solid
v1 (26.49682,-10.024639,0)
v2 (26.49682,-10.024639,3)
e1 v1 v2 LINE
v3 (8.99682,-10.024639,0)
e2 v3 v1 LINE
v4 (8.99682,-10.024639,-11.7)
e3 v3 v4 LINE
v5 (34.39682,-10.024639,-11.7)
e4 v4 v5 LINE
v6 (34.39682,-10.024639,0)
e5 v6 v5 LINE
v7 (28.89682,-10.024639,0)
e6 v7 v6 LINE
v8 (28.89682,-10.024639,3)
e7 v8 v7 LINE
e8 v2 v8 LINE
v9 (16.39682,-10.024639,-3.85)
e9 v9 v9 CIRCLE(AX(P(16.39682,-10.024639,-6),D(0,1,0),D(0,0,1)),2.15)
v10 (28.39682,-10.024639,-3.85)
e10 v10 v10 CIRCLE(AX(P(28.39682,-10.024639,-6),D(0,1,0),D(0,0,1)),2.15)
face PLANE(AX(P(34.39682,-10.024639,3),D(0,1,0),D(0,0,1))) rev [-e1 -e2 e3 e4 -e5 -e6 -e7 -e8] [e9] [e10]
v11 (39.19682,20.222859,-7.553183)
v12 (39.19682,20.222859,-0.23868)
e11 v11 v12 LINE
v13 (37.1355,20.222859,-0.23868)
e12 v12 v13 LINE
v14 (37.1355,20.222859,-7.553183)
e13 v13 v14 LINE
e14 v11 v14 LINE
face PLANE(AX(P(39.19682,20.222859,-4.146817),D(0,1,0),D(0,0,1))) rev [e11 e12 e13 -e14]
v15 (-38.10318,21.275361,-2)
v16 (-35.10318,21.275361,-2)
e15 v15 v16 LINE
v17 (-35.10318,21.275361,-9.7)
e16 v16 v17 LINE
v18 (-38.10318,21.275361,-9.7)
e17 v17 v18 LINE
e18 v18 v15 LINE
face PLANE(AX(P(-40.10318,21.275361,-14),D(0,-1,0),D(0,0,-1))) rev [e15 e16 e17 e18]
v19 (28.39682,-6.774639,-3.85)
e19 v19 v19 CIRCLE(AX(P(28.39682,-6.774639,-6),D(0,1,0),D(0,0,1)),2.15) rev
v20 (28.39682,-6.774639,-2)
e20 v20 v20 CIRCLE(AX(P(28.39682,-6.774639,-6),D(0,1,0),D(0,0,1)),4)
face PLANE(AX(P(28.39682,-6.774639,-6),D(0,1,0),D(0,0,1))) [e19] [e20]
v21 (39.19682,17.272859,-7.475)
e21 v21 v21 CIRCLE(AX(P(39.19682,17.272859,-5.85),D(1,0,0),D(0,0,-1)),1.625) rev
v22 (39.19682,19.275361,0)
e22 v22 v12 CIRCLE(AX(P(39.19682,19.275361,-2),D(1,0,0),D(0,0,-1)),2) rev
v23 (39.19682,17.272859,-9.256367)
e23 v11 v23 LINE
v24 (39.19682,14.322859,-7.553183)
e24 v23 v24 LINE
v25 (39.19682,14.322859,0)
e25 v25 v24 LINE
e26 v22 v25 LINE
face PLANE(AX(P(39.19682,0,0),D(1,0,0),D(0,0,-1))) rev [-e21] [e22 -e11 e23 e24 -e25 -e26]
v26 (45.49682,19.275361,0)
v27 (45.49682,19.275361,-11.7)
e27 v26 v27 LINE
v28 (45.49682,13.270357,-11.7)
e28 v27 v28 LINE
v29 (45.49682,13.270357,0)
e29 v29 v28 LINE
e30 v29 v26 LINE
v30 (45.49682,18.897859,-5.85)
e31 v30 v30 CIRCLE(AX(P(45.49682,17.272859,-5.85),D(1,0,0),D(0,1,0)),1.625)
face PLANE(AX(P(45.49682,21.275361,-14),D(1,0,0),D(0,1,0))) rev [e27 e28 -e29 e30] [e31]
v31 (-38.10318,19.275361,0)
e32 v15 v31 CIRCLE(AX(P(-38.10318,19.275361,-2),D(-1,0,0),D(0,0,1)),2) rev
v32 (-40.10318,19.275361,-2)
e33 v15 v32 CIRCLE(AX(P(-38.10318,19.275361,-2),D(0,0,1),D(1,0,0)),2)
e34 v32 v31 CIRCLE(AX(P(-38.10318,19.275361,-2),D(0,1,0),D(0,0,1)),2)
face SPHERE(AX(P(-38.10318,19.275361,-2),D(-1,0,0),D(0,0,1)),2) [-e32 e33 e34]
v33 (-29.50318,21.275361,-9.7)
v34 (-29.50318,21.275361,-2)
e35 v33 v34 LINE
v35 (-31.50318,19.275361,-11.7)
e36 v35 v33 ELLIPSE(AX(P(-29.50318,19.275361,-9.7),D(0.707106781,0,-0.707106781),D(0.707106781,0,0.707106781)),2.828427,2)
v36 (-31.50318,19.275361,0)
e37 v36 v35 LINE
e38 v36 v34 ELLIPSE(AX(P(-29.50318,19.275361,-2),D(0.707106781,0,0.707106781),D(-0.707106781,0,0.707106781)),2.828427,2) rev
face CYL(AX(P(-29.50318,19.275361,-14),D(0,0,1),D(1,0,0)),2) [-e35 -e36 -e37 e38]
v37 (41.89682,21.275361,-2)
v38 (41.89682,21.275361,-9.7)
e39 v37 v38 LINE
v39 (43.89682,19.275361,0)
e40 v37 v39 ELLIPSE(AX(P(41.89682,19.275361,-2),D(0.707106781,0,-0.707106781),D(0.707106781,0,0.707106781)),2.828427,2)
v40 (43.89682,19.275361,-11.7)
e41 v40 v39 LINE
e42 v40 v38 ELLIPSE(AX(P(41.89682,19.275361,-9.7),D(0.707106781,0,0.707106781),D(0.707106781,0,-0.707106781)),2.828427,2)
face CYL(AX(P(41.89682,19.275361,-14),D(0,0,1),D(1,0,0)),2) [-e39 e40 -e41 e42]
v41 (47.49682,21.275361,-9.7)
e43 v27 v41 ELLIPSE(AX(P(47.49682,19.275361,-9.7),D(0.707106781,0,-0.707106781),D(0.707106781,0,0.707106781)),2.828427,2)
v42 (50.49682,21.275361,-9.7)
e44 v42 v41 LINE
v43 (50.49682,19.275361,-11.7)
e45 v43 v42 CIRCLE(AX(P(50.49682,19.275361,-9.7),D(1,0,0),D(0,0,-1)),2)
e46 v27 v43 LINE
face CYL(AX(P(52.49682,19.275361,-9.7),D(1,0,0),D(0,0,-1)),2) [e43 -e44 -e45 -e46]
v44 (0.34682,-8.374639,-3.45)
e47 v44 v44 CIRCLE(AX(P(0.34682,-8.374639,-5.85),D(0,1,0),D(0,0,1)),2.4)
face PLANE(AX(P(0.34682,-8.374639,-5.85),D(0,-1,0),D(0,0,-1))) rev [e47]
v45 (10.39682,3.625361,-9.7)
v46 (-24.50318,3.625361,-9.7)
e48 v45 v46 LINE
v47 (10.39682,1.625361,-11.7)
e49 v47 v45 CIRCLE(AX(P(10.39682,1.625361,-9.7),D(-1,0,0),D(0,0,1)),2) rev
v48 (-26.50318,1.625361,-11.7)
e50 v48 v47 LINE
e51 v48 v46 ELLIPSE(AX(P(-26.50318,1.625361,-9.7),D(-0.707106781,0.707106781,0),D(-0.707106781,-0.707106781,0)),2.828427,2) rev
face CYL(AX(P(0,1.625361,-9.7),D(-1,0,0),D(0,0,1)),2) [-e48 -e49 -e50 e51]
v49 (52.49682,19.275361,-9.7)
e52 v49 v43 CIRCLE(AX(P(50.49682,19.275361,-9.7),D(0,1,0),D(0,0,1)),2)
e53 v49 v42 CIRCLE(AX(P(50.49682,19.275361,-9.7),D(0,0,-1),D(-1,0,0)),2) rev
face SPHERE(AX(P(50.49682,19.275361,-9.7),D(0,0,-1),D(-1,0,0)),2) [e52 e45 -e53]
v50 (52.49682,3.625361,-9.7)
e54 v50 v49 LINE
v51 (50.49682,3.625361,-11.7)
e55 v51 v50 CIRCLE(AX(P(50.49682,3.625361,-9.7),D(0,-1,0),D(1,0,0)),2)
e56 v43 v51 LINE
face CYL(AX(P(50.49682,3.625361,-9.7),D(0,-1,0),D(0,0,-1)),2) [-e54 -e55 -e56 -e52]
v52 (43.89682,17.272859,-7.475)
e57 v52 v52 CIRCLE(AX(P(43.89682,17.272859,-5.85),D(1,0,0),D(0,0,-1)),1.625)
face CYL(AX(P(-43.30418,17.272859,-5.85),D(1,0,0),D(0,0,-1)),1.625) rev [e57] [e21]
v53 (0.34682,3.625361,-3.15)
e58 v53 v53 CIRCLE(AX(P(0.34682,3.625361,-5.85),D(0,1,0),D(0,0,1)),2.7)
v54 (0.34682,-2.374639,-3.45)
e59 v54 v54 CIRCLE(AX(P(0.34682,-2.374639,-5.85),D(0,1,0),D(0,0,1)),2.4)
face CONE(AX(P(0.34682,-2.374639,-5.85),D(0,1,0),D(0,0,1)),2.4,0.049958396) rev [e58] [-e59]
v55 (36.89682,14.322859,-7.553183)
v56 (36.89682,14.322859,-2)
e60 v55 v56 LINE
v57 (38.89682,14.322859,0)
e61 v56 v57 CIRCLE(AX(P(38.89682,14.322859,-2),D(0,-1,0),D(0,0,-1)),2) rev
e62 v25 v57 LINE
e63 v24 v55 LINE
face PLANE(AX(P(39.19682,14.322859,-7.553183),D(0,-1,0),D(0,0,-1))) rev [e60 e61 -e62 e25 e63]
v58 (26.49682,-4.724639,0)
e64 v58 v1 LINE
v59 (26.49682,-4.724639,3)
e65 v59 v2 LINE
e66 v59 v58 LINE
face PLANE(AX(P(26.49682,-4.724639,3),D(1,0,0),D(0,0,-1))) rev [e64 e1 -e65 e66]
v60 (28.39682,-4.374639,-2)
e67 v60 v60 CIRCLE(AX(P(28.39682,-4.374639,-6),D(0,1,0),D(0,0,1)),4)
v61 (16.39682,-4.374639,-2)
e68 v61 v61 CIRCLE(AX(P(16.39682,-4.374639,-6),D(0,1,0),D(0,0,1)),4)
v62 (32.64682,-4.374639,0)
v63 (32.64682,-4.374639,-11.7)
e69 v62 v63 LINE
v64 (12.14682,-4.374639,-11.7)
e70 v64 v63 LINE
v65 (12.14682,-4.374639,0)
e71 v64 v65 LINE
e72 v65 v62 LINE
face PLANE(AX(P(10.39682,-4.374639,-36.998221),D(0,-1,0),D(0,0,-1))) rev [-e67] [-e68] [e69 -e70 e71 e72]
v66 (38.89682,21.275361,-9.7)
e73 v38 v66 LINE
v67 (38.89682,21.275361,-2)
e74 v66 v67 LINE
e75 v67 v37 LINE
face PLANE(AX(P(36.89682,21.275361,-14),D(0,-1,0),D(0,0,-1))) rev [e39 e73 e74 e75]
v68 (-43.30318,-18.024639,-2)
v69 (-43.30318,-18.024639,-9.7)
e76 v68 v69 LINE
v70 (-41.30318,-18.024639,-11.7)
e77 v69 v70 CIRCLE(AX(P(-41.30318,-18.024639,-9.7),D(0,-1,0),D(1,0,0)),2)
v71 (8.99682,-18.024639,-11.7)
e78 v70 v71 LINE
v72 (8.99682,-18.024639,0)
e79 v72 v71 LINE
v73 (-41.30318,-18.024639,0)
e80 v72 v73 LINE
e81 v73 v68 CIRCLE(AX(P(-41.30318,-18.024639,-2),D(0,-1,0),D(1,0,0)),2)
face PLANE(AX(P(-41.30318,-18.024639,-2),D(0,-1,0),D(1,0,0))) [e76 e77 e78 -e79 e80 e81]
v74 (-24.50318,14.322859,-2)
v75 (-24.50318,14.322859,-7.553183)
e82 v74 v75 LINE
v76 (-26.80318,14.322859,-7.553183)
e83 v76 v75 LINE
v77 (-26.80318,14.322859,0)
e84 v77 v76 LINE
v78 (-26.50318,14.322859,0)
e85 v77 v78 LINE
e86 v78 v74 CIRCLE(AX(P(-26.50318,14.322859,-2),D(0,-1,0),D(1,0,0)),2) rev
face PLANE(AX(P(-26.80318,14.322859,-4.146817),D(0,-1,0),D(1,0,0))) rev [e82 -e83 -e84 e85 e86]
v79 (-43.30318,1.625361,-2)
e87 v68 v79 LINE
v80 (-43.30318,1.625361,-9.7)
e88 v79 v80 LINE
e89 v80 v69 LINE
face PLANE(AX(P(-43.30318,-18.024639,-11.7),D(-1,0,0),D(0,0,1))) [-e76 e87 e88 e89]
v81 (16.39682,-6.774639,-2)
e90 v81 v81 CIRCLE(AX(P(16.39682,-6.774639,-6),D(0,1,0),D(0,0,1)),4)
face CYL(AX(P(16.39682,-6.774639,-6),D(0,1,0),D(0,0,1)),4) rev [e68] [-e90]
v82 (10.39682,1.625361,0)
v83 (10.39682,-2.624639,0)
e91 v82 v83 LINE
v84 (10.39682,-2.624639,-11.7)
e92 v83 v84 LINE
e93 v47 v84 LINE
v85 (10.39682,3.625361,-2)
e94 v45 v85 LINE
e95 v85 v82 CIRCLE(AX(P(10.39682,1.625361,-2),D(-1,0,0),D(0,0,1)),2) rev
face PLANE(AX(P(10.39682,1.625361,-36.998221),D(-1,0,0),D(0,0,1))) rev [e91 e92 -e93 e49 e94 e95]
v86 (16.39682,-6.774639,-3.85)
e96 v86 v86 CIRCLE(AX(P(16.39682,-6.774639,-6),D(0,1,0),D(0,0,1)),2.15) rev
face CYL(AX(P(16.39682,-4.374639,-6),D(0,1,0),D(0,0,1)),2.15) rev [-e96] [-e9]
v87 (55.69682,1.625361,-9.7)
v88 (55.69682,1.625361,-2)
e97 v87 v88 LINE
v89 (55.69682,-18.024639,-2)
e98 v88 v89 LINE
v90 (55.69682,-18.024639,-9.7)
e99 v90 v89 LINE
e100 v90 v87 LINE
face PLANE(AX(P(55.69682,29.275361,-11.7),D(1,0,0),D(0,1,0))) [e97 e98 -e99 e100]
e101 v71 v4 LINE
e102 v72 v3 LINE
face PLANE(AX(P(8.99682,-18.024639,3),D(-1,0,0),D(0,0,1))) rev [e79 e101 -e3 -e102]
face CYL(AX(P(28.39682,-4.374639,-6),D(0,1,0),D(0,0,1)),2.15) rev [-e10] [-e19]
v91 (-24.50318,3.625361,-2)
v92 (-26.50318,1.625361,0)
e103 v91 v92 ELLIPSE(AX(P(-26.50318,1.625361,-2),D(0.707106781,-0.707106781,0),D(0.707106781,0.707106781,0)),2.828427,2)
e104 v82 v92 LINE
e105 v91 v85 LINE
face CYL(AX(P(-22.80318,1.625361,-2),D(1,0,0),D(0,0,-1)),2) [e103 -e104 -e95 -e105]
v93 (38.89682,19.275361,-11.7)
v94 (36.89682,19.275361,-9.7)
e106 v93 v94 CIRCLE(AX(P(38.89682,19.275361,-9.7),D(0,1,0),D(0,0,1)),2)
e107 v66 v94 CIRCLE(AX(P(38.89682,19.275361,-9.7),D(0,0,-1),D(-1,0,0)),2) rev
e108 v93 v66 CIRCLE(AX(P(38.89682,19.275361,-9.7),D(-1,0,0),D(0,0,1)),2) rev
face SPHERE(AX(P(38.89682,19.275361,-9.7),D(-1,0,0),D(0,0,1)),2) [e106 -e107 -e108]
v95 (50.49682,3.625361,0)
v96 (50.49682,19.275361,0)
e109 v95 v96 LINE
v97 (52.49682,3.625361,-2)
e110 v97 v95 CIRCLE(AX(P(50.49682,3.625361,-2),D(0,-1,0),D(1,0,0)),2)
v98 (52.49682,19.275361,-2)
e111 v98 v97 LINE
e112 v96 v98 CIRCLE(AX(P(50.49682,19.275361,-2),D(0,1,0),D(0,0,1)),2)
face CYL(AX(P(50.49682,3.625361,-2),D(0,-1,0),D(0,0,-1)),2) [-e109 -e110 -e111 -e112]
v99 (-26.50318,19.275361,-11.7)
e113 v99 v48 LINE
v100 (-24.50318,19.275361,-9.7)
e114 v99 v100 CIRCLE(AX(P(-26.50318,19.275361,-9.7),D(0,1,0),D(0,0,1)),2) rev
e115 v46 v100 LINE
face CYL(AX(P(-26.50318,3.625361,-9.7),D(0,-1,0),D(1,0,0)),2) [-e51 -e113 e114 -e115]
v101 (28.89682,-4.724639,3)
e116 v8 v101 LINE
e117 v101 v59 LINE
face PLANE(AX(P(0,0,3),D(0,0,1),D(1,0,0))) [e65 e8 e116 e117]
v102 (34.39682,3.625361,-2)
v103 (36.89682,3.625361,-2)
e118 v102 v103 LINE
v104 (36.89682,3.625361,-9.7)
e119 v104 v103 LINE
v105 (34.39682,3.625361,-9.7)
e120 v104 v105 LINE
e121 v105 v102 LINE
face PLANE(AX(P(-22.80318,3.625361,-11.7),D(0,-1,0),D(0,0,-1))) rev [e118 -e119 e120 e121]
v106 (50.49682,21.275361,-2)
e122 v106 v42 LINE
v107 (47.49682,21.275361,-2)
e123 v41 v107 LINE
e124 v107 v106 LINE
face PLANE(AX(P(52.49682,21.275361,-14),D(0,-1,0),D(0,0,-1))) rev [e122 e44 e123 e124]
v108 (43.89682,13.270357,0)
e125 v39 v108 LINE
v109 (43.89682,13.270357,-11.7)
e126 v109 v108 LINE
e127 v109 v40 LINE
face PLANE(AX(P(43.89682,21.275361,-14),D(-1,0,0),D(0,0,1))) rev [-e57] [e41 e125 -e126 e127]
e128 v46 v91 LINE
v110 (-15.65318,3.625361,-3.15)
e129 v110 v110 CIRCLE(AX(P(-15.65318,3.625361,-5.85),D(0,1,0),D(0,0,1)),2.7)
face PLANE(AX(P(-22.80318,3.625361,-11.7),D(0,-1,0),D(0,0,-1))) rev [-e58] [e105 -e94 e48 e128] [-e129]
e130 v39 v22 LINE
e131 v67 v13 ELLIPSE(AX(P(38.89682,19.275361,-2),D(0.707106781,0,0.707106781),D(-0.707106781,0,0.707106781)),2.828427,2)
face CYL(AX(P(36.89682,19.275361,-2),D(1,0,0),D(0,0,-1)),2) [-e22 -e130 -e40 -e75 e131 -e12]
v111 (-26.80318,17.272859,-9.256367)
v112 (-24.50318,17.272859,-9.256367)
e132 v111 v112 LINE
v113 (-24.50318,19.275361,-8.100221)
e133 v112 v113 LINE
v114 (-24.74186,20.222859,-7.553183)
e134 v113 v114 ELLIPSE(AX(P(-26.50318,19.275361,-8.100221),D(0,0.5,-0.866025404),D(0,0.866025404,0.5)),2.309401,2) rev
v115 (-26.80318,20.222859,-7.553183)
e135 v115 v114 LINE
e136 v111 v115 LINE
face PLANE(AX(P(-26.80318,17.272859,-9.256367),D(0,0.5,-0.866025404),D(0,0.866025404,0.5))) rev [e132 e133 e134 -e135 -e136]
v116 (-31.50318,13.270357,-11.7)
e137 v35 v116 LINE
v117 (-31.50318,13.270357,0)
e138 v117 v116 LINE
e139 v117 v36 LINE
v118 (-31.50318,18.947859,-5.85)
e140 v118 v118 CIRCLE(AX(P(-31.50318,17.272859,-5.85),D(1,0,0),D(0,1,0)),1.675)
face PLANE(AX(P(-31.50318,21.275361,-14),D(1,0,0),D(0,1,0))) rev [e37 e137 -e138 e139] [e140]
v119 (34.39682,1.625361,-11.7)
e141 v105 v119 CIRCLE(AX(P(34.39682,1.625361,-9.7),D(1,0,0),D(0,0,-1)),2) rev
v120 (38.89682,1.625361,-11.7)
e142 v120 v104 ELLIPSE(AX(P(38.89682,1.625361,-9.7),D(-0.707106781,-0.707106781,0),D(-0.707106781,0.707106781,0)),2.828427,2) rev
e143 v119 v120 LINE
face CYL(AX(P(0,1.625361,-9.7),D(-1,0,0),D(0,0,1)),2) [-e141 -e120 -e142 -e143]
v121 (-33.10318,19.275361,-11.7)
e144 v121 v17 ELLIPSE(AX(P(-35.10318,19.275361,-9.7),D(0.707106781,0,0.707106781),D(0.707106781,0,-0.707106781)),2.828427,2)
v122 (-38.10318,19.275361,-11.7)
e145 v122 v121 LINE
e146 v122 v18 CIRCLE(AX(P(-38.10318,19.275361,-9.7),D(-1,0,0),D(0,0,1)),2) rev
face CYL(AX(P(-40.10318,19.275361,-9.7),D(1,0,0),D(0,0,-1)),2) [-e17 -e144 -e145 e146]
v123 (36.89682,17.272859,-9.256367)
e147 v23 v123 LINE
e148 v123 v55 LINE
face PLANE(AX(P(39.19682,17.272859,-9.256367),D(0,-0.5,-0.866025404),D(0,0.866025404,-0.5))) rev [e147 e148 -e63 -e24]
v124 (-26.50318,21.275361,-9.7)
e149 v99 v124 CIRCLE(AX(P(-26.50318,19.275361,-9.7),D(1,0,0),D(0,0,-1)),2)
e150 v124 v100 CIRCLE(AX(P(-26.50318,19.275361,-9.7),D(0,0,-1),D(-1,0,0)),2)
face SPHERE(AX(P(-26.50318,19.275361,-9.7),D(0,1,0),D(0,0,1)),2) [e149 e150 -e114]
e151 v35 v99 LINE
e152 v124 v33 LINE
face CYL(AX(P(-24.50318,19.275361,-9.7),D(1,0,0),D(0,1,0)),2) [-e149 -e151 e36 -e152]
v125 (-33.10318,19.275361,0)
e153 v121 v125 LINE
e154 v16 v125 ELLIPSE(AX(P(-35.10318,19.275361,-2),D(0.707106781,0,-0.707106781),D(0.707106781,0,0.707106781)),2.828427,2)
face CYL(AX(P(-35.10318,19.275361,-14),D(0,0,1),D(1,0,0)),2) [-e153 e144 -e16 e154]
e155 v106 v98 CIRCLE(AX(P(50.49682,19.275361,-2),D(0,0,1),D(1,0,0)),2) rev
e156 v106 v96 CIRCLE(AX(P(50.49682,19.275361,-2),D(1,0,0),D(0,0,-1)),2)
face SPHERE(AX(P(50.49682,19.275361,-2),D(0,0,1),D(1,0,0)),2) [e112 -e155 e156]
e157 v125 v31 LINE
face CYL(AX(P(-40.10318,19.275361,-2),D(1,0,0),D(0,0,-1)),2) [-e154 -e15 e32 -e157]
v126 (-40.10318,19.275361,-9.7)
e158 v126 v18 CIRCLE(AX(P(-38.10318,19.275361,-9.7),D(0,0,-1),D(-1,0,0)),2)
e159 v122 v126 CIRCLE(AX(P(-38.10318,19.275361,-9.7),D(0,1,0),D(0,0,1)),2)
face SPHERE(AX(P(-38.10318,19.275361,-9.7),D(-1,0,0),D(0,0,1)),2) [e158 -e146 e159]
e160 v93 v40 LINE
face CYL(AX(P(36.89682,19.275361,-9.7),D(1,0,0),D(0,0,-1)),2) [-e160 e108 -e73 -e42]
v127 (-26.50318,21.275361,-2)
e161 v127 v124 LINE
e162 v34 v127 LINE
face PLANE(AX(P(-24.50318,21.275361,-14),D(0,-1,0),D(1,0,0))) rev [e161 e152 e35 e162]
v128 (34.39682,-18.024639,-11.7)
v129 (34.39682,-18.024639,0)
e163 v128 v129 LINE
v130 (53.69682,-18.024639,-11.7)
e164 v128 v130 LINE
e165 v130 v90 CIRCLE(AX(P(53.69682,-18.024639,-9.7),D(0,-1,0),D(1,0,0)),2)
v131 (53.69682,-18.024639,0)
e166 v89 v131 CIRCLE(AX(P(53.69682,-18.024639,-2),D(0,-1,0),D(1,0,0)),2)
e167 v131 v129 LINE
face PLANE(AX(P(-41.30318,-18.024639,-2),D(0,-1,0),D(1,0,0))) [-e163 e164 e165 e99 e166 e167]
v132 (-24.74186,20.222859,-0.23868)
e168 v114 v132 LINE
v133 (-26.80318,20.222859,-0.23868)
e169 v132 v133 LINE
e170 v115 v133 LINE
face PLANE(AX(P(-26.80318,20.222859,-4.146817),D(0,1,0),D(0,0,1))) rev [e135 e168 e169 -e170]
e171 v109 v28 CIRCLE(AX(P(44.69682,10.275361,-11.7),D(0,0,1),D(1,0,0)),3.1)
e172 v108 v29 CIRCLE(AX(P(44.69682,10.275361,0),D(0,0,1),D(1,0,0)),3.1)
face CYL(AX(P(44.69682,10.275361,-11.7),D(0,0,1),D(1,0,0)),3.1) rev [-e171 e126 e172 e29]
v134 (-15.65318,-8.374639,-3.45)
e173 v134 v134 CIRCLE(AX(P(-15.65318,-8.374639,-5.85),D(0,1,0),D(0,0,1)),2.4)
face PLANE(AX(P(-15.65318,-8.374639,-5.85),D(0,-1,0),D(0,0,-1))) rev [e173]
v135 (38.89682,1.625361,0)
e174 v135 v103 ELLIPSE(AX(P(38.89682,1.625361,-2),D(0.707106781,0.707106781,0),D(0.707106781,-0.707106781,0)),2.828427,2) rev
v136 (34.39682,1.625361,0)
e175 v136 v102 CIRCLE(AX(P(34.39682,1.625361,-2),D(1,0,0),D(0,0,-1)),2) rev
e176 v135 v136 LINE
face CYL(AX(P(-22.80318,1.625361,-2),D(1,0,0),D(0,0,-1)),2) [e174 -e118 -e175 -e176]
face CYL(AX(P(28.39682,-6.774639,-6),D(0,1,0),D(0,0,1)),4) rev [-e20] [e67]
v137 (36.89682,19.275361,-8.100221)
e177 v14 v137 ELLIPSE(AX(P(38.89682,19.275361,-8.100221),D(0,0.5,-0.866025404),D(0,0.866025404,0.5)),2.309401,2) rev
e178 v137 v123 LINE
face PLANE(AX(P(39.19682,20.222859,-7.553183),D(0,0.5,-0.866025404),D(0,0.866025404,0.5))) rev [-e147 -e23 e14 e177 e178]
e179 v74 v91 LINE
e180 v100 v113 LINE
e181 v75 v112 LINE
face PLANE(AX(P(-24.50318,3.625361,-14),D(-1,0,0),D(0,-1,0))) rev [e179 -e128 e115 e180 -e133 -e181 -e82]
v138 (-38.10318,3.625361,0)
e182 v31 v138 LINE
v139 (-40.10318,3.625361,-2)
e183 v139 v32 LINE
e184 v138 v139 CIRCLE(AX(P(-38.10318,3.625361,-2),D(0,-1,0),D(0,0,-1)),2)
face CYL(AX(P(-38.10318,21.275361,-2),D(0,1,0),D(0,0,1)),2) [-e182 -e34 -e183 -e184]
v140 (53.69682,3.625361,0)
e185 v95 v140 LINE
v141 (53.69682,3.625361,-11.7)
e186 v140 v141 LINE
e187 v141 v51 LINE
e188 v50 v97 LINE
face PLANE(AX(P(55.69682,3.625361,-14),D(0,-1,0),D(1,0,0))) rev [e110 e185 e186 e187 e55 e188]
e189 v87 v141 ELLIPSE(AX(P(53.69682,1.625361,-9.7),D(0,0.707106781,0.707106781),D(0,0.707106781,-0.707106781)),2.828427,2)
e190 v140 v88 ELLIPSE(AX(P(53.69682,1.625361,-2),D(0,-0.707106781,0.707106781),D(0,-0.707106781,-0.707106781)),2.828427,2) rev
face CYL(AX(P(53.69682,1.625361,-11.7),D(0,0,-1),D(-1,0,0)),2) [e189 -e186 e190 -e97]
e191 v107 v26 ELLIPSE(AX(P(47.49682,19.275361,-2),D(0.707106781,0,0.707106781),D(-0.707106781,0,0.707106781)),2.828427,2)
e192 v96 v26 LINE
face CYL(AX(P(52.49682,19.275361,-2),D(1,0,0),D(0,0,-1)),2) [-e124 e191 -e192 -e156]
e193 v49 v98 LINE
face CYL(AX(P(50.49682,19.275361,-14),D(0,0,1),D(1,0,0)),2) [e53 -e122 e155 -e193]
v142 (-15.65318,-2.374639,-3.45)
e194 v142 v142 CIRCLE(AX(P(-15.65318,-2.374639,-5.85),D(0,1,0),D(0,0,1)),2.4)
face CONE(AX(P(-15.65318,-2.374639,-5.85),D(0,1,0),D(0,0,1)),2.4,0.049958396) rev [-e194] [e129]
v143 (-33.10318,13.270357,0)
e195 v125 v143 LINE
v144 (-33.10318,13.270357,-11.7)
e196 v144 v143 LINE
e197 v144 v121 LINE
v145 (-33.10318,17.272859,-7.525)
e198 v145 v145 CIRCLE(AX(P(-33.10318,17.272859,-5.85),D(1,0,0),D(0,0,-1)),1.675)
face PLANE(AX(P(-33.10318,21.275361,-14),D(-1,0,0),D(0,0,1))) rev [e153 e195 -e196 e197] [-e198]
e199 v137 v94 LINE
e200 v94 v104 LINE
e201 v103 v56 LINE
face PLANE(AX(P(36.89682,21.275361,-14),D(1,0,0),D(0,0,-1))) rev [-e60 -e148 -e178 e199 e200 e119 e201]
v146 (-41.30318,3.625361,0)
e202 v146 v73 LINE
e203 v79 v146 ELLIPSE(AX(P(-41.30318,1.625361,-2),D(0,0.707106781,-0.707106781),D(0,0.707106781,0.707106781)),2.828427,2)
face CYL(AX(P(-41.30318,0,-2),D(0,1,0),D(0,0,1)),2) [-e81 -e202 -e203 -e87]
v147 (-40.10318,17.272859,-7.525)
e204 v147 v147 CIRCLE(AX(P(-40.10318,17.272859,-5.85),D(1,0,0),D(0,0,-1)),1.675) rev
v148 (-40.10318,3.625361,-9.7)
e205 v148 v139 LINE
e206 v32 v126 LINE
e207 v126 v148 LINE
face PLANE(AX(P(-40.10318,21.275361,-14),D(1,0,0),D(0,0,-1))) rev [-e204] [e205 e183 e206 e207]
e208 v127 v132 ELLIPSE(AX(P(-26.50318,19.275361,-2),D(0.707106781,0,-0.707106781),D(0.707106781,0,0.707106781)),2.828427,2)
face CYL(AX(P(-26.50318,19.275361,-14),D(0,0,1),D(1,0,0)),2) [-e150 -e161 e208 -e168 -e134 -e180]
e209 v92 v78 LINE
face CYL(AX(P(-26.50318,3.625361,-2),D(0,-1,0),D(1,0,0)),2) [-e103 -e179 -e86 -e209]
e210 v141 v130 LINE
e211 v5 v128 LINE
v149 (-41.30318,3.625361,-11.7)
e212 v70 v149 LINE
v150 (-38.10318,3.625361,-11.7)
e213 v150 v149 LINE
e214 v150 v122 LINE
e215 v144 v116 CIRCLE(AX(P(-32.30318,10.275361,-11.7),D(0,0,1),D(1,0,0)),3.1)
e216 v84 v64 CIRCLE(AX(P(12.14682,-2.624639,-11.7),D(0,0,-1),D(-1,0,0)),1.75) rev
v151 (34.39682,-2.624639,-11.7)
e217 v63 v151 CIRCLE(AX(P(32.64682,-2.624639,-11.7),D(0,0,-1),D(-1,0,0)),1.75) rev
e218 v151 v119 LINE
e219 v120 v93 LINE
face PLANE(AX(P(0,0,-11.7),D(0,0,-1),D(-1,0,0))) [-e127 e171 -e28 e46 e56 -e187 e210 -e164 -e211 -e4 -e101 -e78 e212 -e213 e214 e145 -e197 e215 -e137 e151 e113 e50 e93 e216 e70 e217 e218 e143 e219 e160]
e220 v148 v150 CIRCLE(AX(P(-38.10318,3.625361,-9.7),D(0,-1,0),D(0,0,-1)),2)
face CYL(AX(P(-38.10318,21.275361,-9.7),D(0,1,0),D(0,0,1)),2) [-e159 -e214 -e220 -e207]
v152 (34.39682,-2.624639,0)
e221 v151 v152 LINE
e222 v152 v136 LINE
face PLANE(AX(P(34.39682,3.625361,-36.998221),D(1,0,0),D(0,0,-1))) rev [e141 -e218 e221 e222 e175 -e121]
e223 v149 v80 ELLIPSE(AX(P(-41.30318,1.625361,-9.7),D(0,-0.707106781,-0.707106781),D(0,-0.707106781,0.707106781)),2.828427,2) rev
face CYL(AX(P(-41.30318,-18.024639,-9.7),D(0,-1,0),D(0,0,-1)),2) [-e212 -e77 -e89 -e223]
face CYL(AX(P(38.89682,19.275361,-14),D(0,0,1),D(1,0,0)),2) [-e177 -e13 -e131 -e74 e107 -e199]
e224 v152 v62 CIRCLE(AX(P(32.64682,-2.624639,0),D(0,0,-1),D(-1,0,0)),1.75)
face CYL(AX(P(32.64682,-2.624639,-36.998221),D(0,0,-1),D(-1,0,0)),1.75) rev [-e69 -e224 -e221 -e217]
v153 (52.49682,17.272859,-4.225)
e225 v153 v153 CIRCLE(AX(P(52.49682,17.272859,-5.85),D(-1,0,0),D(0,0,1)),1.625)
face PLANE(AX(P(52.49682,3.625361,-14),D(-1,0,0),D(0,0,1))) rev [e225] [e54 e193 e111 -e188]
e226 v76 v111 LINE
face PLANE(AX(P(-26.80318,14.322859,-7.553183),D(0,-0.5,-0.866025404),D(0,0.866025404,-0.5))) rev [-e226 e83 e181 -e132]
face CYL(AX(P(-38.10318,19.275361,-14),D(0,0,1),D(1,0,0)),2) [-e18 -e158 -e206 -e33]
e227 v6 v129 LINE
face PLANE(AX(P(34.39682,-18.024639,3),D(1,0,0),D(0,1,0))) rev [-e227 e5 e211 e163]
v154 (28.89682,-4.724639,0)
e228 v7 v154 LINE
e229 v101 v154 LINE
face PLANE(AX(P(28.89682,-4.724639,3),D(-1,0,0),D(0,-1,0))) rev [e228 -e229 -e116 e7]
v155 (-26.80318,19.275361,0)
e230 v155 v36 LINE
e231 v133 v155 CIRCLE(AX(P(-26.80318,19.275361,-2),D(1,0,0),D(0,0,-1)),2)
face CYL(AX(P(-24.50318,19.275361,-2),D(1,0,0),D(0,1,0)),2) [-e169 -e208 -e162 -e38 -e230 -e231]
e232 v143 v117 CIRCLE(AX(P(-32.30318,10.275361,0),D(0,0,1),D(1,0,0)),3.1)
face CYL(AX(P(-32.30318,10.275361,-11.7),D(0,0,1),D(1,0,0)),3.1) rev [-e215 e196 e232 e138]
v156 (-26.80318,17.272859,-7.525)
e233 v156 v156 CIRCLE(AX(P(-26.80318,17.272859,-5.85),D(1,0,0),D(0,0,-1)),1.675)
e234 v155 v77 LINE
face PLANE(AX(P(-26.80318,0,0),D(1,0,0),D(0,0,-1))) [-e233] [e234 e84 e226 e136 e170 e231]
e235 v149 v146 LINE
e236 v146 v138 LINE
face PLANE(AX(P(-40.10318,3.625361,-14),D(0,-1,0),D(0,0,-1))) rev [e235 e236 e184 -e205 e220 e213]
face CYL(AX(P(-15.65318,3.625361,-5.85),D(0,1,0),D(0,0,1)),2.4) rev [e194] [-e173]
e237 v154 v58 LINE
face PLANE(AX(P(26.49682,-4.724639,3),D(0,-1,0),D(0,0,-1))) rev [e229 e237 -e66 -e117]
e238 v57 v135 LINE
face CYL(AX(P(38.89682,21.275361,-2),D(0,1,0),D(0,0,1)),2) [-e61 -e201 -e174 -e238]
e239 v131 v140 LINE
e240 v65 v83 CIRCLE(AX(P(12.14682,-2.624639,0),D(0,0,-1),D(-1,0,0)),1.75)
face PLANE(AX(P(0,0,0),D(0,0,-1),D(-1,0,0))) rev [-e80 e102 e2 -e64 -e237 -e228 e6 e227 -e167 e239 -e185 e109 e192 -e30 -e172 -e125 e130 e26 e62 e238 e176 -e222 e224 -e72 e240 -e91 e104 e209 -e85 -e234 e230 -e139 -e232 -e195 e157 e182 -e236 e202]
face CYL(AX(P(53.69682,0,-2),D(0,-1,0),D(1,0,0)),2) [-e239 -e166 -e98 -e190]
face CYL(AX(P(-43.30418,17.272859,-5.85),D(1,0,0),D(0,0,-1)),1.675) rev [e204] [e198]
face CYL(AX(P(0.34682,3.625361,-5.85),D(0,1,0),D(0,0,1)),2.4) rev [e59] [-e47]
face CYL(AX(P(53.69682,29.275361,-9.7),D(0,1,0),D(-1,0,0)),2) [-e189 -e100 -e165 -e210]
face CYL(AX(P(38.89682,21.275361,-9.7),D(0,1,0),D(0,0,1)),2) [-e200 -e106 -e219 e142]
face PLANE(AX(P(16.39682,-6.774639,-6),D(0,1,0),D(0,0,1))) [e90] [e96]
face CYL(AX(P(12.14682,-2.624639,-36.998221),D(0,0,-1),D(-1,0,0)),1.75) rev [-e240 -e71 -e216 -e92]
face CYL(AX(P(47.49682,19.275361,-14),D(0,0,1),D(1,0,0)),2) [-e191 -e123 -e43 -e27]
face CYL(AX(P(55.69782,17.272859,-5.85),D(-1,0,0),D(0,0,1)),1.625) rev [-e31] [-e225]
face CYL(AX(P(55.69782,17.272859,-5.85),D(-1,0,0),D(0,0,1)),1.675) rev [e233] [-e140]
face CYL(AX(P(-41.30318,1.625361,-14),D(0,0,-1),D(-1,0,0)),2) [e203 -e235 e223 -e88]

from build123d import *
from OCP.BRepFilletAPI import BRepFilletAPI_MakeChamfer
from build123d.topology import SkipClean

# Parameters (mm, degrees)
SKETCH1_R                      = 3.1
SKETCH1_R_2                    = 3.5
SKETCH1_W                      = 32
SKETCH1_H                      = 15.65
BOSS_EXTRUDE1_DEPTH            = 11.7
CUT_EXTRUDE5_DEPTH             = 14
CUT_EXTRUDE8_REACH             = 96.23
SKETCH10_R                     = 1.675
CUT_EXTRUDE8_DIRECTION_2_REACH = 96.23
CUT_EXTRUDE9_REACH             = 94.724
SKETCH11_R                     = 1.625
CUT_EXTRUDE9_DIRECTION_2_REACH = 94.724
CUT_EXTRUDE10_DEPTH            = 2.3
CUT_EXTRUDE11_DEPTH            = 2.3
HOLE1_D                        = 4.8
HOLE1_DEPTH                    = 12
HOLE1_CBORE_D                  = 5.4
HOLE1_CBORE_DEPTH              = 6
CUT_EXTRUDE17_REACH            = 66.001
SKETCH30_W                     = 59.4
SKETCH30_H                     = 25.65
SKETCH32_W                     = 99
SKETCH32_H                     = 8
CUT_EXTRUDE20_DEPTH            = 65.000566
CHAMFER1_SIZE                  = 6
CHAMFER1_SIZE_2                = 0.3
FILLET1_R                      = 2
SKETCH33_W                     = 2.4
SKETCH33_H                     = 5.3
BOSS_EXTRUDE2_DEPTH            = 3
SKETCH34_W                     = 99
SKETCH34_H                     = 8
CUT_EXTRUDE21_DEPTH            = 61.759087
CUT_EXTRUDE22_START            = -11.7
CUT_EXTRUDE22_DEPTH            = 11.7
BOSS_EXTRUDE4_DEPTH            = 8
SKETCH45_W                     = 25.4
SKETCH45_H                     = 8
CUT_EXTRUDE26_DEPTH            = 62.407383
M4_CLEARANCE_HOLE1_D           = 4.3
SKETCH46_2_R                   = 4
CUT_EXTRUDE27_DEPTH            = 2.4
FILLET5_R                      = 1.75


# Some blends are built 0.0001 mm under size
with BuildPart() as part:
    # Sketch1 → Boss-Extrude1 (new body)
    with BuildSketch(Plane.XY):
        Polygon((-43.30318, 29.275361), (25.69682, 29.275361), (55.69682, 29.275361), (55.69682, -18.024639), (-43.30318, -18.024639), align=None)
        with Locations((-32.30318, 10.275361)):
            Circle(SKETCH1_R, mode=Mode.SUBTRACT)
        with Locations((44.69682, 10.275361)):
            Circle(SKETCH1_R, mode=Mode.SUBTRACT)
        with Locations((22.69682, 12.275361)):
            Circle(SKETCH1_R_2, mode=Mode.SUBTRACT)
        with Locations((-6.80318, 11.450361)):
            Rectangle(SKETCH1_W, SKETCH1_H, mode=Mode.SUBTRACT)
    extrude(amount=-BOSS_EXTRUDE1_DEPTH)

    # Sketch7 → Cut-Extrude5 (cut)
    with BuildSketch(Plane.XY):
        with BuildLine():
            Line((-43.30318, 22.775361), (-22.50318, 22.775361))
            Line((-22.50318, 22.775361), (-22.50318, 3.625361))
            Line((-22.50318, 3.625361), (-24.50318, 3.625361))
            Line((-24.50318, 3.625361), (-24.50318, 21.275361))
            Line((-24.50318, 21.275361), (-31.50318, 21.275361))
            Line((-31.50318, 21.275361), (-31.50318, 13.270357))
            ThreePointArc((-31.50318, 13.270357), (-32.30318, 7.175361), (-33.10318, 13.270357))
            Line((-33.10318, 13.270357), (-33.10318, 21.275361))
            Line((-33.10318, 21.275361), (-40.10318, 21.275361))
            Line((-40.10318, 21.275361), (-40.10318, 3.625361))
            Line((-40.10318, 3.625361), (-43.30318, 3.625361))
            Line((-43.30318, 3.625361), (-43.30318, 22.775361))
        make_face()
        with BuildLine():
            Line((34.89682, 22.775361), (55.69682, 22.775361))
            Line((55.69682, 22.775361), (55.69682, 3.625361))
            Line((55.69682, 3.625361), (52.49682, 3.625361))
            Line((52.49682, 3.625361), (52.49682, 21.275361))
            Line((52.49682, 21.275361), (45.49682, 21.275361))
            Line((45.49682, 21.275361), (45.49682, 13.270357))
            ThreePointArc((45.49682, 13.270357), (44.69682, 7.175361), (43.89682, 13.270357))
            Line((43.89682, 13.270357), (43.89682, 21.275361))
            Line((43.89682, 21.275361), (36.89682, 21.275361))
            Line((36.89682, 21.275361), (36.89682, 3.625361))
            Line((36.89682, 3.625361), (34.89682, 3.625361))
            Line((34.89682, 3.625361), (34.89682, 22.775361))
        make_face()
    extrude(amount=-CUT_EXTRUDE5_DEPTH, mode=Mode.SUBTRACT)

    # Sketch10 → Cut-Extrude8 (cut, up to next)
    with BuildSketch(Plane(origin=(-33.10318, 0, 0), x_dir=(0, 0, -1), z_dir=(1, 0, 0)), mode=Mode.PRIVATE) as cut_extrude8_sk1:
        with Locations(Location((5.85, 17.272859, 0), (0, 0, 270))):
            Circle(SKETCH10_R)
    cut_extrude8_tool1 = extrude(cut_extrude8_sk1.sketch, amount=-CUT_EXTRUDE8_REACH, mode=Mode.PRIVATE) & part.part
    add(cut_extrude8_tool1.solids().sort_by_distance((-33.10318, 17.272859, -5.85))[0], mode=Mode.SUBTRACT)

    # Sketch10 → Cut-Extrude8 direction 2 (cut, up to next)
    with BuildSketch(Plane(origin=(-33.10318, 0, 0), x_dir=(0, 0, -1), z_dir=(1, 0, 0)), mode=Mode.PRIVATE) as cut_extrude8_direction_2_sk1:
        with Locations(Location((5.85, 17.272859, 0), (0, 0, 270))):
            Circle(SKETCH10_R)
    cut_extrude8_direction_2_tool1 = extrude(cut_extrude8_direction_2_sk1.sketch, amount=CUT_EXTRUDE8_DIRECTION_2_REACH, mode=Mode.PRIVATE) & part.part
    add(cut_extrude8_direction_2_tool1.solids().sort_by_distance((-33.10318, 17.272859, -5.85))[0], mode=Mode.SUBTRACT)

    # Sketch11 → Cut-Extrude9 (cut, up to next)
    with BuildSketch(Plane(origin=(43.89682, 0, 0), x_dir=(0, 0, -1), z_dir=(1, 0, 0)), mode=Mode.PRIVATE) as cut_extrude9_sk1:
        with Locations(Location((5.85, 17.272859, 0), (0, 0, 180))):
            Circle(SKETCH11_R)
    cut_extrude9_tool1 = extrude(cut_extrude9_sk1.sketch, amount=-CUT_EXTRUDE9_REACH, mode=Mode.PRIVATE) & part.part
    add(cut_extrude9_tool1.solids().sort_by_distance((43.89682, 17.272859, -5.85))[0], mode=Mode.SUBTRACT)

    # Sketch11 → Cut-Extrude9 direction 2 (cut, up to next)
    with BuildSketch(Plane(origin=(43.89682, 0, 0), x_dir=(0, 0, -1), z_dir=(1, 0, 0)), mode=Mode.PRIVATE) as cut_extrude9_direction_2_sk1:
        with Locations(Location((5.85, 17.272859, 0), (0, 0, 180))):
            Circle(SKETCH11_R)
    cut_extrude9_direction_2_tool1 = extrude(cut_extrude9_direction_2_sk1.sketch, amount=CUT_EXTRUDE9_DIRECTION_2_REACH, mode=Mode.PRIVATE) & part.part
    add(cut_extrude9_direction_2_tool1.solids().sort_by_distance((43.89682, 17.272859, -5.85))[0], mode=Mode.SUBTRACT)

    # Sketch12 → Cut-Extrude10 (cut)
    with BuildSketch(Plane.ZY.offset(-36.89682)):
        Polygon((-4.146817, 20.222859), (0, 20.222859), (0, 14.322859), (-4.146817, 14.322859), (-7.553183, 14.322859), (-9.256367, 17.272859), (-7.553183, 20.222859), align=None)
    extrude(amount=-CUT_EXTRUDE10_DEPTH, mode=Mode.SUBTRACT)

    # Sketch13 → Cut-Extrude11 (cut)
    with BuildSketch(Plane(origin=(-24.50318, 0, 0), x_dir=(0, 0, -1), z_dir=(1, 0, 0))):
        Polygon((4.146817, 20.222859), (0, 20.222859), (0, 14.322859), (4.146817, 14.322859), (7.553183, 14.322859), (9.256367, 17.272859), (7.553183, 20.222859), align=None)
    extrude(amount=-CUT_EXTRUDE11_DEPTH, mode=Mode.SUBTRACT)

    # Hole1
    with Locations(Plane(origin=(0, 3.625361, 0), x_dir=(1, 0, 0), z_dir=(0, 1, 0))):
        with Locations((-15.65318, 5.85), (0.34682, 5.85)):
            CounterBoreHole(HOLE1_D / 2, HOLE1_CBORE_D / 2, HOLE1_CBORE_DEPTH, depth=HOLE1_DEPTH)

    # Sketch30 → Cut-Extrude17 (cut, up to next)
    with BuildSketch(Plane(origin=(0, 0, -11.7), x_dir=(-1, 0, 0), z_dir=(0, 0, -1)), mode=Mode.PRIVATE) as cut_extrude17_sk1:
        with Locations((-5.19682, 16.450361)):
            Rectangle(SKETCH30_W, SKETCH30_H)
    cut_extrude17_tool1 = extrude(cut_extrude17_sk1.sketch, amount=-CUT_EXTRUDE17_REACH, mode=Mode.PRIVATE) & part.part
    add(cut_extrude17_tool1.solids().sort_by_distance((5.19682, 16.450361, -11.7))[0], mode=Mode.SUBTRACT)


with BuildPart() as cut_extrude17_piece_1:
    # of the separate pieces the step leaves, piece 1, a body of its own (cut_extrude17_pieces)
    add(part.part.solids().sort_by_distance((-24.50318, 3.625361, 0))[0])

    # Chamfer1
    chamfer1_edges_1 = [cut_extrude17_piece_1.edges().sort_by_distance(p)[0] for p in [
        (-2.35318, -2.374639, -5.85),
    ]]
    chamfer1_side_1 = [cut_extrude17_piece_1.faces().sort_by_distance(p)[0] for p in [
        (-2.35318, -2.368639, -5.85),
    ]]
    chamfer1_edges_2 = [cut_extrude17_piece_1.edges().sort_by_distance(p)[0] for p in [
        (-18.35318, -2.374639, -5.85),
    ]]
    chamfer1_side_2 = [cut_extrude17_piece_1.faces().sort_by_distance(p)[0] for p in [
        (-18.35318, -2.368639, -5.85),
    ]]
    chamfer1 = BRepFilletAPI_MakeChamfer(cut_extrude17_piece_1.part.solid().wrapped)
    for e in chamfer1_edges_1:
        chamfer1.Add(CHAMFER1_SIZE - 0.0001, CHAMFER1_SIZE_2 - 0.0001, e.wrapped, chamfer1_side_1[0].wrapped)
    for e in chamfer1_edges_2:
        chamfer1.Add(CHAMFER1_SIZE - 0.0001, CHAMFER1_SIZE_2 - 0.0001, e.wrapped, chamfer1_side_2[0].wrapped)
    add(Compound.cast(chamfer1.Shape()), mode=Mode.REPLACE)  # a hair under: the kernel refuses the full size

    # Fillet1
    # the kernel refuses this fillet: 2 mm, written as the material it takes off along each edge
    with BuildSketch(Plane(origin=(50.49682, 19.275361, -2), x_dir=(1, 0, 0), z_dir=(0, 1, 0))) as fillet1_piece_1_section:
        Polygon((0, 0), (FILLET1_R, 0), (FILLET1_R, -FILLET1_R), (0, -FILLET1_R), align=None)
    fillet1_piece_1 = extrude(amount=FILLET1_R, mode=Mode.PRIVATE)
    fillet1_piece_1 = fillet1_piece_1 - Plane(origin=(50.49682, 19.275361, -2), x_dir=(-0.7071067811865475, 0, -0.7071067811865475), z_dir=(0, 1, 0)) * Sphere(FILLET1_R, mode=Mode.PRIVATE)
    add(fillet1_piece_1, mode=Mode.SUBTRACT)
    with BuildSketch(Plane(origin=(50.49682, 19.275361, -9.7), x_dir=(1, 0, 0), z_dir=(0, 1, 0))) as fillet1_piece_2_section:
        Polygon((0, 0), (FILLET1_R, 0), (FILLET1_R, FILLET1_R), (0, FILLET1_R), align=None)
    fillet1_piece_2 = extrude(amount=FILLET1_R, mode=Mode.PRIVATE)
    fillet1_piece_2 = fillet1_piece_2 - Plane(origin=(50.49682, 19.275361, -9.7), x_dir=(-0.7071067811865475, 0, 0.7071067811865475), z_dir=(0, 1, 0)) * Sphere(FILLET1_R, mode=Mode.PRIVATE)
    add(fillet1_piece_2, mode=Mode.SUBTRACT)
    with BuildSketch(Plane(origin=(38.89682, 19.275361, -9.7), x_dir=(-1, 0, 0), z_dir=(0, 0, -1))) as fillet1_piece_3_section:
        Polygon((0, 0), (FILLET1_R, 0), (FILLET1_R, FILLET1_R), (0, FILLET1_R), align=None)
    fillet1_piece_3 = extrude(amount=FILLET1_R, mode=Mode.PRIVATE)
    fillet1_piece_3 = fillet1_piece_3 - Plane(origin=(38.89682, 19.275361, -9.7), x_dir=(0.7071067811865475, -0.7071067811865475, 0), z_dir=(0, 0, -1)) * Sphere(FILLET1_R, mode=Mode.PRIVATE)
    add(fillet1_piece_3, mode=Mode.SUBTRACT)
    with BuildSketch(Plane(origin=(-38.10318, 19.275361, -2), x_dir=(0, 1, 0), z_dir=(-1, 0, 0))) as fillet1_piece_4_section:
        Polygon((0, 0), (FILLET1_R, 0), (FILLET1_R, -FILLET1_R), (0, -FILLET1_R), align=None)
    fillet1_piece_4 = extrude(amount=FILLET1_R, mode=Mode.PRIVATE)
    fillet1_piece_4 = fillet1_piece_4 - Plane(origin=(-38.10318, 19.275361, -2), x_dir=(0, -0.7071067811865475, -0.7071067811865475), z_dir=(-1, 0, 0)) * Sphere(FILLET1_R, mode=Mode.PRIVATE)
    add(fillet1_piece_4, mode=Mode.SUBTRACT)
    with BuildSketch(Plane(origin=(-38.10318, 19.275361, -9.7), x_dir=(0, 1, 0), z_dir=(-1, 0, 0))) as fillet1_piece_5_section:
        Polygon((0, 0), (FILLET1_R, 0), (FILLET1_R, FILLET1_R), (0, FILLET1_R), align=None)
    fillet1_piece_5 = extrude(amount=FILLET1_R, mode=Mode.PRIVATE)
    fillet1_piece_5 = fillet1_piece_5 - Plane(origin=(-38.10318, 19.275361, -9.7), x_dir=(0, -0.7071067811865475, 0.7071067811865475), z_dir=(-1, 0, 0)) * Sphere(FILLET1_R, mode=Mode.PRIVATE)
    add(fillet1_piece_5, mode=Mode.SUBTRACT)
    with BuildSketch(Plane(origin=(-26.50318, 19.275361, -9.7), x_dir=(0, 0, -1), z_dir=(1, 0, 0))) as fillet1_piece_6_section:
        Polygon((0, 0), (FILLET1_R, 0), (FILLET1_R, FILLET1_R), (0, FILLET1_R), align=None)
    fillet1_piece_6 = extrude(amount=FILLET1_R, mode=Mode.PRIVATE)
    fillet1_piece_6 = fillet1_piece_6 - Plane(origin=(-26.50318, 19.275361, -9.7), x_dir=(0, -0.7071067811865475, 0.7071067811865475), z_dir=(1, 0, 0)) * Sphere(FILLET1_R, mode=Mode.PRIVATE)
    add(fillet1_piece_6, mode=Mode.SUBTRACT)
    with BuildSketch(Plane(origin=(52.49682, 21.275361, -2), x_dir=(-1, 0, 0), z_dir=(0, 0, -1)), Plane(origin=(-40.10318, 21.275361, -2), x_dir=(0, -1, 0), z_dir=(0, 0, -1))) as fillet1_piece_7:
        with BuildLine():
            CenterArc((FILLET1_R, -FILLET1_R), FILLET1_R, 90, 90)
            Line((0, -FILLET1_R), (0, 0))
            Line((0, 0), (FILLET1_R, 0))
        make_face()
    extrude(amount=7.7, mode=Mode.SUBTRACT)
    with BuildSketch(Plane(origin=(50.49682, 21.275361, 0), x_dir=(0, -1, 0), z_dir=(-1, 0, 0)), Plane(origin=(40.49682, 21.275361, -11.7), x_dir=(0, -1, 0), z_dir=(1, 0, 0)), Plane(origin=(38.89682, 21.275361, -11.7), x_dir=(0, -1, 0), z_dir=(1, 0, 0)), Plane(origin=(-28.10318, 21.275361, 0), x_dir=(0, -1, 0), z_dir=(-1, 0, 0)), Plane(origin=(-38.10318, 21.275361, -11.7), x_dir=(0, -1, 0), z_dir=(1, 0, 0)), Plane(origin=(-36.50318, 21.275361, -11.7), x_dir=(0, -1, 0), z_dir=(1, 0, 0))) as fillet1_piece_8:
        with BuildLine():
            CenterArc((FILLET1_R, -FILLET1_R), FILLET1_R, 90, 90)
            Line((0, -FILLET1_R), (0, 0))
            Line((0, 0), (FILLET1_R, 0))
        make_face()
    extrude(amount=10, mode=Mode.SUBTRACT)
    with BuildSketch(Plane(origin=(45.49682, 21.275361, 5), x_dir=(0, -1, 0), z_dir=(0, 0, -1)), Plane(origin=(43.89682, 21.275361, 5), x_dir=(-1, 0, 0), z_dir=(0, 0, -1)), Plane(origin=(-33.10318, 21.275361, 5), x_dir=(-1, 0, 0), z_dir=(0, 0, -1)), Plane(origin=(55.69682, 3.625361, 5), x_dir=(-1, 0, 0), z_dir=(0, 0, -1)), Plane(origin=(-43.30318, 3.625361, 5), x_dir=(0, -1, 0), z_dir=(0, 0, -1))) as fillet1_piece_9:
        with BuildLine():
            CenterArc((FILLET1_R, -FILLET1_R), FILLET1_R, 90, 90)
            Line((0, -FILLET1_R), (0, 0))
            Line((0, 0), (FILLET1_R, 0))
        make_face()
    extrude(amount=21.7, mode=Mode.SUBTRACT)
    with BuildSketch(Plane(origin=(48.89682, 21.275361, 0), x_dir=(0, -1, 0), z_dir=(-1, 0, 0)), Plane(origin=(-19.50318, 21.275361, 0), x_dir=(0, -1, 0), z_dir=(-1, 0, 0))) as fillet1_piece_10:
        with BuildLine():
            CenterArc((FILLET1_R, -FILLET1_R), FILLET1_R, 90, 90)
            Line((0, -FILLET1_R), (0, 0))
            Line((0, 0), (FILLET1_R, 0))
        make_face()
    extrude(amount=17, mode=Mode.SUBTRACT)
    with BuildSketch(Plane(origin=(36.89682, 21.275361, 5), x_dir=(0, -1, 0), z_dir=(0, 0, -1))) as fillet1_piece_11:
        with BuildLine():
            CenterArc((FILLET1_R, -FILLET1_R), FILLET1_R, 90, 90)
            Line((0, -FILLET1_R), (0, 0))
            Line((0, 0), (FILLET1_R, 0))
        make_face()
    extrude(amount=14.7, mode=Mode.SUBTRACT)
    with BuildSketch(Plane(origin=(-24.50318, 21.275361, 5), x_dir=(0, -1, 0), z_dir=(0, 0, -1))) as fillet1_piece_12:
        with BuildLine():
            CenterArc((FILLET1_R, FILLET1_R), FILLET1_R, 180, 90)
            Line((0, FILLET1_R), (0, 0))
            Line((0, 0), (FILLET1_R, 0))
        make_face()
    extrude(amount=14.7, mode=Mode.SUBTRACT)
    with BuildSketch(Plane(origin=(-31.50318, 21.275361, 5), x_dir=(1, 0, 0), z_dir=(0, 0, -1))) as fillet1_piece_13:
        with BuildLine():
            CenterArc((FILLET1_R, FILLET1_R), FILLET1_R, 180, 90)
            Line((0, FILLET1_R), (0, 0))
            Line((0, 0), (FILLET1_R, 0))
        make_face()
    extrude(amount=21.7, mode=Mode.SUBTRACT)
    with BuildSketch(Plane(origin=(55.69682, 8.625361, 0), x_dir=(-1, 0, 0), z_dir=(0, -1, 0)), Plane(origin=(-43.30318, -23.024639, 0), x_dir=(1, 0, 0), z_dir=(0, 1, 0))) as fillet1_piece_14:
        with BuildLine():
            CenterArc((FILLET1_R, FILLET1_R), FILLET1_R, 180, 90)
            Line((0, FILLET1_R), (0, 0))
            Line((0, 0), (FILLET1_R, 0))
        make_face()
    extrude(amount=31.65, mode=Mode.SUBTRACT)
    with BuildSketch(Plane(origin=(55.69682, 8.625361, -11.7), x_dir=(-1, 0, 0), z_dir=(0, -1, 0)), Plane(origin=(-43.30318, -23.024639, -11.7), x_dir=(1, 0, 0), z_dir=(0, 1, 0))) as fillet1_piece_15:
        with BuildLine():
            CenterArc((FILLET1_R, -FILLET1_R), FILLET1_R, 90, 90)
            Line((0, -FILLET1_R), (0, 0))
            Line((0, 0), (FILLET1_R, 0))
        make_face()
    extrude(amount=31.65, mode=Mode.SUBTRACT)
    with BuildSketch(Plane(origin=(36.89682, 3.625361, -11.7), x_dir=(0, 0, 1), z_dir=(-1, 0, 0))) as fillet1_piece_16:
        with BuildLine():
            CenterArc((FILLET1_R, -FILLET1_R), FILLET1_R, 90, 90)
            Line((0, -FILLET1_R), (0, 0))
            Line((0, 0), (FILLET1_R, 0))
        make_face()
    extrude(amount=61.4, mode=Mode.SUBTRACT)
    with BuildSketch(Plane(origin=(36.89682, 3.625361, 0), x_dir=(0, 0, -1), z_dir=(-1, 0, 0))) as fillet1_piece_17:
        with BuildLine():
            CenterArc((FILLET1_R, FILLET1_R), FILLET1_R, 180, 90)
            Line((0, FILLET1_R), (0, 0))
            Line((0, 0), (FILLET1_R, 0))
        make_face()
    extrude(amount=61.4, mode=Mode.SUBTRACT)
    with BuildSketch(Plane(origin=(36.89682, 19.322859, 0), x_dir=(0, 0, -1), z_dir=(0, -1, 0)), Plane(origin=(-24.50318, 3.625361, 0), x_dir=(0, 0, -1), z_dir=(0, 1, 0))) as fillet1_piece_18:
        with BuildLine():
            CenterArc((FILLET1_R, FILLET1_R), FILLET1_R, 180, 90)
            Line((0, FILLET1_R), (0, 0))
            Line((0, 0), (FILLET1_R, 0))
        make_face()
    extrude(amount=15.697498, mode=Mode.SUBTRACT)
    with BuildSketch(Plane(origin=(52.49682, 3.625361, 0), x_dir=(-1, 0, 0), z_dir=(0, 1, 0)), Plane(origin=(36.89682, 3.625361, -11.7), x_dir=(1, 0, 0), z_dir=(0, 1, 0)), Plane(origin=(52.49682, 19.275361, -11.7), x_dir=(-1, 0, 0), z_dir=(0, -1, 0)), Plane(origin=(-40.10318, 19.275361, 0), x_dir=(1, 0, 0), z_dir=(0, -1, 0)), Plane(origin=(-40.10318, 3.625361, -11.7), x_dir=(1, 0, 0), z_dir=(0, 1, 0))) as fillet1_piece_19:
        with BuildLine():
            CenterArc((FILLET1_R, -FILLET1_R), FILLET1_R, 90, 90)
            Line((0, -FILLET1_R), (0, 0))
            Line((0, 0), (FILLET1_R, 0))
        make_face()
    extrude(amount=15.65, mode=Mode.SUBTRACT)
    with BuildSketch(Plane(origin=(-24.50318, 19.275361, -11.7), x_dir=(0, 0, 1), z_dir=(0, -1, 0))) as fillet1_piece_20:
        with BuildLine():
            CenterArc((FILLET1_R, FILLET1_R), FILLET1_R, 180, 90)
            Line((0, FILLET1_R), (0, 0))
            Line((0, 0), (FILLET1_R, 0))
        make_face()
    extrude(amount=15.65, mode=Mode.SUBTRACT)
    with BuildSketch(Plane(origin=(41.89682, 3.625361, -11.7), x_dir=(0, 0, 1), z_dir=(-1, 0, 0))) as fillet1_piece_21a_section:
        with BuildLine():
            CenterArc((FILLET1_R, -FILLET1_R), FILLET1_R, 90, 90)
            Line((0, -FILLET1_R), (0, 0))
            Line((0, 0), (FILLET1_R, 0))
        make_face()
    fillet1_piece_21a = extrude(amount=66.4, mode=Mode.PRIVATE)
    fillet1_piece_21a = split(fillet1_piece_21a, bisect_by=Plane(origin=(36.89682, 3.172571, -11.24721), z_dir=(1, 0, 0)), keep=Keep.TOP, mode=Mode.PRIVATE)
    with BuildSketch(Plane(origin=(36.89682, -1.374639, -11.7), x_dir=(1, 0, 0), z_dir=(0, 1, 0))) as fillet1_piece_21b_section:
        with BuildLine():
            CenterArc((FILLET1_R, -FILLET1_R), FILLET1_R, 90, 90)
            Line((0, -FILLET1_R), (0, 0))
            Line((0, 0), (FILLET1_R, 0))
        make_face()
    fillet1_piece_21b = extrude(amount=20.65, mode=Mode.PRIVATE)
    fillet1_piece_21b = split(fillet1_piece_21b, bisect_by=Plane(origin=(37.34961, 3.625361, -11.24721), z_dir=(0, -1, 0)), keep=Keep.TOP, mode=Mode.PRIVATE)
    fillet1_piece_21 = fillet1_piece_21a & fillet1_piece_21b
    add(fillet1_piece_21, mode=Mode.SUBTRACT)
    with BuildSketch(Plane(origin=(36.89682, 3.625361, -11.7), x_dir=(0, 0, 1), z_dir=(-1, 0, 0))) as fillet1_piece_22a_section:
        with BuildLine():
            CenterArc((FILLET1_R, -FILLET1_R), FILLET1_R, 90, 90)
            Line((0, -FILLET1_R), (0, 0))
            Line((0, 0), (FILLET1_R, 0))
        make_face()
    fillet1_piece_22a = extrude(amount=66.4, mode=Mode.PRIVATE)
    fillet1_piece_22a = split(fillet1_piece_22a, bisect_by=Plane(origin=(-24.50318, 3.172571, -11.24721), z_dir=(-1, 0, 0)), keep=Keep.TOP, mode=Mode.PRIVATE)
    with BuildSketch(Plane(origin=(-24.50318, 19.275361, -11.7), x_dir=(0, 0, 1), z_dir=(0, -1, 0))) as fillet1_piece_22b_section:
        with BuildLine():
            CenterArc((FILLET1_R, FILLET1_R), FILLET1_R, 180, 90)
            Line((0, FILLET1_R), (0, 0))
            Line((0, 0), (FILLET1_R, 0))
        make_face()
    fillet1_piece_22b = extrude(amount=20.65, mode=Mode.PRIVATE)
    fillet1_piece_22b = split(fillet1_piece_22b, bisect_by=Plane(origin=(-24.955971, 3.625361, -11.24721), z_dir=(0, -1, 0)), keep=Keep.TOP, mode=Mode.PRIVATE)
    fillet1_piece_22 = fillet1_piece_22a & fillet1_piece_22b
    add(fillet1_piece_22, mode=Mode.SUBTRACT)
    with BuildSketch(Plane(origin=(41.89682, 3.625361, 0), x_dir=(0, 0, -1), z_dir=(-1, 0, 0))) as fillet1_piece_23a_section:
        with BuildLine():
            CenterArc((FILLET1_R, FILLET1_R), FILLET1_R, 180, 90)
            Line((0, FILLET1_R), (0, 0))
            Line((0, 0), (FILLET1_R, 0))
        make_face()
    fillet1_piece_23a = extrude(amount=66.4, mode=Mode.PRIVATE)
    fillet1_piece_23a = split(fillet1_piece_23a, bisect_by=Plane(origin=(36.89682, 3.172571, -0.45279), z_dir=(1, 0, 0)), keep=Keep.TOP, mode=Mode.PRIVATE)
    with BuildSketch(Plane(origin=(36.89682, 19.322859, 0), x_dir=(0, 0, -1), z_dir=(0, -1, 0))) as fillet1_piece_23b_section:
        with BuildLine():
            CenterArc((FILLET1_R, FILLET1_R), FILLET1_R, 180, 90)
            Line((0, FILLET1_R), (0, 0))
            Line((0, 0), (FILLET1_R, 0))
        make_face()
    fillet1_piece_23b = extrude(amount=20.697498, mode=Mode.PRIVATE)
    fillet1_piece_23b = split(fillet1_piece_23b, bisect_by=Plane(origin=(37.34961, 3.625361, -0.45279), z_dir=(0, -1, 0)), keep=Keep.TOP, mode=Mode.PRIVATE)
    fillet1_piece_23 = fillet1_piece_23a & fillet1_piece_23b
    add(fillet1_piece_23, mode=Mode.SUBTRACT)
    with BuildSketch(Plane(origin=(36.89682, 3.625361, 0), x_dir=(0, 0, -1), z_dir=(-1, 0, 0))) as fillet1_piece_24a_section:
        with BuildLine():
            CenterArc((FILLET1_R, FILLET1_R), FILLET1_R, 180, 90)
            Line((0, FILLET1_R), (0, 0))
            Line((0, 0), (FILLET1_R, 0))
        make_face()
    fillet1_piece_24a = extrude(amount=66.4, mode=Mode.PRIVATE)
    fillet1_piece_24a = split(fillet1_piece_24a, bisect_by=Plane(origin=(-24.50318, 3.172571, -0.45279), z_dir=(-1, 0, 0)), keep=Keep.TOP, mode=Mode.PRIVATE)
    with BuildSketch(Plane(origin=(-24.50318, -1.374639, 0), x_dir=(0, 0, -1), z_dir=(0, 1, 0))) as fillet1_piece_24b_section:
        with BuildLine():
            CenterArc((FILLET1_R, FILLET1_R), FILLET1_R, 180, 90)
            Line((0, FILLET1_R), (0, 0))
            Line((0, 0), (FILLET1_R, 0))
        make_face()
    fillet1_piece_24b = extrude(amount=20.697498, mode=Mode.PRIVATE)
    fillet1_piece_24b = split(fillet1_piece_24b, bisect_by=Plane(origin=(-24.955971, 3.625361, -0.45279), z_dir=(0, -1, 0)), keep=Keep.TOP, mode=Mode.PRIVATE)
    fillet1_piece_24 = fillet1_piece_24a & fillet1_piece_24b
    add(fillet1_piece_24, mode=Mode.SUBTRACT)

    # Sketch33 → Boss-Extrude2 (add)
    with BuildSketch(Plane.XY):
        with Locations((27.69682, -7.374639)):
            Rectangle(SKETCH33_W, SKETCH33_H)
    extrude(amount=BOSS_EXTRUDE2_DEPTH)

    # Sketch34 → Cut-Extrude21 (cut, through all)
    with BuildSketch(Plane.XY):
        with Locations((6.19682, -14.024639)):
            Rectangle(SKETCH34_W, SKETCH34_H)
    extrude(amount=-CUT_EXTRUDE21_DEPTH, mode=Mode.SUBTRACT)

    # Sketch35 → Cut-Extrude22 (cut)
    with BuildSketch(Plane.XY.offset(CUT_EXTRUDE22_START)):
        Polygon((17.39682, 3.625361), (28.359066, 3.625361), (34.39682, 3.625361), (34.39682, -4.374639), (10.39682, -4.374639), (10.39682, 1.625361), (10.39682, 3.625361), align=None)
    extrude(amount=CUT_EXTRUDE22_DEPTH, mode=Mode.SUBTRACT)

    # Sketch36 → Boss-Extrude4 (add)
    with SkipClean():  # the faces are left unmerged after this step: merging them gives an invalid solid
        with BuildSketch(Plane.XZ.offset(10.024639)):
            with BuildLine():
                Line((26.49682, 3), (26.49682, 0))
                Line((26.49682, 0), (-41.30318, 0))
                ThreePointArc((-41.30318, 0), (-42.717394, -0.585786), (-43.30318, -2))
                Line((-43.30318, -2), (-43.30318, -9.7))
                ThreePointArc((-43.30318, -9.7), (-42.717394, -11.114214), (-41.30318, -11.7))
                Line((-41.30318, -11.7), (53.69682, -11.7))
                ThreePointArc((53.69682, -11.7), (55.111033, -11.114214), (55.69682, -9.7))
                Line((55.69682, -9.7), (55.69682, -2))
                ThreePointArc((55.69682, -2), (55.111033, -0.585786), (53.69682, 0))
                Line((53.69682, 0), (28.89682, 0))
                Line((28.89682, 0), (28.89682, 3))
                Line((28.89682, 3), (26.49682, 3))
            make_face()
        extrude(amount=BOSS_EXTRUDE4_DEPTH)

    # Sketch45 → Cut-Extrude26 (cut, through all)
    with SkipClean():  # the faces are left unmerged after this step: merging them gives an invalid solid
        with BuildSketch(Plane(origin=(0, 0, -11.7), x_dir=(-1, 0, 0), z_dir=(0, 0, -1))):
            with Locations((-21.69682, -14.024639)):
                Rectangle(SKETCH45_W, SKETCH45_H)
        extrude(amount=-CUT_EXTRUDE26_DEPTH, mode=Mode.SUBTRACT)

    # M4 Clearance Hole1 (through all)
    with Locations(Plane(origin=(0, -4.374639, 0), x_dir=(1, 0, 0), z_dir=(0, 1, 0))):
        with Locations((16.39682, 6), (28.39682, 6)):
            Hole(M4_CLEARANCE_HOLE1_D / 2)

    # Sketch46<2> → Cut-Extrude27 (cut)
    with SkipClean():  # the faces are left unmerged after this step: merging them gives an invalid solid
        with BuildSketch(Plane(origin=(0, -4.374639, 0), x_dir=(1, 0, 0), z_dir=(0, 1, 0))):
            with Locations(Location((16.39682, 6, 0), (0, 0, 270))):
                Circle(SKETCH46_2_R)
            with Locations(Location((28.39682, 6, 0), (0, 0, 270))):
                Circle(SKETCH46_2_R)
        extrude(amount=-CUT_EXTRUDE27_DEPTH, mode=Mode.SUBTRACT)

    # Fillet5
    fillet5_edges = [cut_extrude17_piece_1.edges().sort_by_distance(p)[0] for p in [
        (10.39682, -4.374639, -5.85),
        (34.39682, -4.374639, -5.85),
    ]]
    fillet(fillet5_edges, radius=FILLET5_R)


with BuildPart() as cut_extrude17_piece_2:
    # of the separate pieces the step leaves, piece 2, a body of its own (cut_extrude17_pieces)
    add(part.part.solids().sort_by_distance((34.89682, 29.275361, 0))[0])


with BuildPart() as cut_extrude17_piece_3:
    # of the separate pieces the step leaves, piece 3, a body of its own (cut_extrude17_pieces)
    add(part.part.solids().sort_by_distance((-43.30318, 29.275361, 0))[0])


with BuildPart() as cut_extrude20_tool:
    # Sketch32 → Cut-Extrude20 (new, through all)
    with BuildSketch(Plane(origin=(0, 0, -11.7), x_dir=(-1, 0, 0), z_dir=(0, 0, -1))):
        with Locations((-6.19682, 25.275361)):
            Rectangle(SKETCH32_W, SKETCH32_H)
    extrude(amount=-CUT_EXTRUDE20_DEPTH)


with BuildPart() as cut_extrude17_piece_2_1:
    add(cut_extrude17_piece_2.part)

    # Cut-Extrude20: cut by cut_extrude20_tool
    add(cut_extrude20_tool.part, mode=Mode.SUBTRACT)


with BuildPart() as cut_extrude17_piece_3_1:
    add(cut_extrude17_piece_3.part)

    # Cut-Extrude20: cut by cut_extrude20_tool
    add(cut_extrude20_tool.part, mode=Mode.SUBTRACT)


solid = cut_extrude17_piece_1.part
